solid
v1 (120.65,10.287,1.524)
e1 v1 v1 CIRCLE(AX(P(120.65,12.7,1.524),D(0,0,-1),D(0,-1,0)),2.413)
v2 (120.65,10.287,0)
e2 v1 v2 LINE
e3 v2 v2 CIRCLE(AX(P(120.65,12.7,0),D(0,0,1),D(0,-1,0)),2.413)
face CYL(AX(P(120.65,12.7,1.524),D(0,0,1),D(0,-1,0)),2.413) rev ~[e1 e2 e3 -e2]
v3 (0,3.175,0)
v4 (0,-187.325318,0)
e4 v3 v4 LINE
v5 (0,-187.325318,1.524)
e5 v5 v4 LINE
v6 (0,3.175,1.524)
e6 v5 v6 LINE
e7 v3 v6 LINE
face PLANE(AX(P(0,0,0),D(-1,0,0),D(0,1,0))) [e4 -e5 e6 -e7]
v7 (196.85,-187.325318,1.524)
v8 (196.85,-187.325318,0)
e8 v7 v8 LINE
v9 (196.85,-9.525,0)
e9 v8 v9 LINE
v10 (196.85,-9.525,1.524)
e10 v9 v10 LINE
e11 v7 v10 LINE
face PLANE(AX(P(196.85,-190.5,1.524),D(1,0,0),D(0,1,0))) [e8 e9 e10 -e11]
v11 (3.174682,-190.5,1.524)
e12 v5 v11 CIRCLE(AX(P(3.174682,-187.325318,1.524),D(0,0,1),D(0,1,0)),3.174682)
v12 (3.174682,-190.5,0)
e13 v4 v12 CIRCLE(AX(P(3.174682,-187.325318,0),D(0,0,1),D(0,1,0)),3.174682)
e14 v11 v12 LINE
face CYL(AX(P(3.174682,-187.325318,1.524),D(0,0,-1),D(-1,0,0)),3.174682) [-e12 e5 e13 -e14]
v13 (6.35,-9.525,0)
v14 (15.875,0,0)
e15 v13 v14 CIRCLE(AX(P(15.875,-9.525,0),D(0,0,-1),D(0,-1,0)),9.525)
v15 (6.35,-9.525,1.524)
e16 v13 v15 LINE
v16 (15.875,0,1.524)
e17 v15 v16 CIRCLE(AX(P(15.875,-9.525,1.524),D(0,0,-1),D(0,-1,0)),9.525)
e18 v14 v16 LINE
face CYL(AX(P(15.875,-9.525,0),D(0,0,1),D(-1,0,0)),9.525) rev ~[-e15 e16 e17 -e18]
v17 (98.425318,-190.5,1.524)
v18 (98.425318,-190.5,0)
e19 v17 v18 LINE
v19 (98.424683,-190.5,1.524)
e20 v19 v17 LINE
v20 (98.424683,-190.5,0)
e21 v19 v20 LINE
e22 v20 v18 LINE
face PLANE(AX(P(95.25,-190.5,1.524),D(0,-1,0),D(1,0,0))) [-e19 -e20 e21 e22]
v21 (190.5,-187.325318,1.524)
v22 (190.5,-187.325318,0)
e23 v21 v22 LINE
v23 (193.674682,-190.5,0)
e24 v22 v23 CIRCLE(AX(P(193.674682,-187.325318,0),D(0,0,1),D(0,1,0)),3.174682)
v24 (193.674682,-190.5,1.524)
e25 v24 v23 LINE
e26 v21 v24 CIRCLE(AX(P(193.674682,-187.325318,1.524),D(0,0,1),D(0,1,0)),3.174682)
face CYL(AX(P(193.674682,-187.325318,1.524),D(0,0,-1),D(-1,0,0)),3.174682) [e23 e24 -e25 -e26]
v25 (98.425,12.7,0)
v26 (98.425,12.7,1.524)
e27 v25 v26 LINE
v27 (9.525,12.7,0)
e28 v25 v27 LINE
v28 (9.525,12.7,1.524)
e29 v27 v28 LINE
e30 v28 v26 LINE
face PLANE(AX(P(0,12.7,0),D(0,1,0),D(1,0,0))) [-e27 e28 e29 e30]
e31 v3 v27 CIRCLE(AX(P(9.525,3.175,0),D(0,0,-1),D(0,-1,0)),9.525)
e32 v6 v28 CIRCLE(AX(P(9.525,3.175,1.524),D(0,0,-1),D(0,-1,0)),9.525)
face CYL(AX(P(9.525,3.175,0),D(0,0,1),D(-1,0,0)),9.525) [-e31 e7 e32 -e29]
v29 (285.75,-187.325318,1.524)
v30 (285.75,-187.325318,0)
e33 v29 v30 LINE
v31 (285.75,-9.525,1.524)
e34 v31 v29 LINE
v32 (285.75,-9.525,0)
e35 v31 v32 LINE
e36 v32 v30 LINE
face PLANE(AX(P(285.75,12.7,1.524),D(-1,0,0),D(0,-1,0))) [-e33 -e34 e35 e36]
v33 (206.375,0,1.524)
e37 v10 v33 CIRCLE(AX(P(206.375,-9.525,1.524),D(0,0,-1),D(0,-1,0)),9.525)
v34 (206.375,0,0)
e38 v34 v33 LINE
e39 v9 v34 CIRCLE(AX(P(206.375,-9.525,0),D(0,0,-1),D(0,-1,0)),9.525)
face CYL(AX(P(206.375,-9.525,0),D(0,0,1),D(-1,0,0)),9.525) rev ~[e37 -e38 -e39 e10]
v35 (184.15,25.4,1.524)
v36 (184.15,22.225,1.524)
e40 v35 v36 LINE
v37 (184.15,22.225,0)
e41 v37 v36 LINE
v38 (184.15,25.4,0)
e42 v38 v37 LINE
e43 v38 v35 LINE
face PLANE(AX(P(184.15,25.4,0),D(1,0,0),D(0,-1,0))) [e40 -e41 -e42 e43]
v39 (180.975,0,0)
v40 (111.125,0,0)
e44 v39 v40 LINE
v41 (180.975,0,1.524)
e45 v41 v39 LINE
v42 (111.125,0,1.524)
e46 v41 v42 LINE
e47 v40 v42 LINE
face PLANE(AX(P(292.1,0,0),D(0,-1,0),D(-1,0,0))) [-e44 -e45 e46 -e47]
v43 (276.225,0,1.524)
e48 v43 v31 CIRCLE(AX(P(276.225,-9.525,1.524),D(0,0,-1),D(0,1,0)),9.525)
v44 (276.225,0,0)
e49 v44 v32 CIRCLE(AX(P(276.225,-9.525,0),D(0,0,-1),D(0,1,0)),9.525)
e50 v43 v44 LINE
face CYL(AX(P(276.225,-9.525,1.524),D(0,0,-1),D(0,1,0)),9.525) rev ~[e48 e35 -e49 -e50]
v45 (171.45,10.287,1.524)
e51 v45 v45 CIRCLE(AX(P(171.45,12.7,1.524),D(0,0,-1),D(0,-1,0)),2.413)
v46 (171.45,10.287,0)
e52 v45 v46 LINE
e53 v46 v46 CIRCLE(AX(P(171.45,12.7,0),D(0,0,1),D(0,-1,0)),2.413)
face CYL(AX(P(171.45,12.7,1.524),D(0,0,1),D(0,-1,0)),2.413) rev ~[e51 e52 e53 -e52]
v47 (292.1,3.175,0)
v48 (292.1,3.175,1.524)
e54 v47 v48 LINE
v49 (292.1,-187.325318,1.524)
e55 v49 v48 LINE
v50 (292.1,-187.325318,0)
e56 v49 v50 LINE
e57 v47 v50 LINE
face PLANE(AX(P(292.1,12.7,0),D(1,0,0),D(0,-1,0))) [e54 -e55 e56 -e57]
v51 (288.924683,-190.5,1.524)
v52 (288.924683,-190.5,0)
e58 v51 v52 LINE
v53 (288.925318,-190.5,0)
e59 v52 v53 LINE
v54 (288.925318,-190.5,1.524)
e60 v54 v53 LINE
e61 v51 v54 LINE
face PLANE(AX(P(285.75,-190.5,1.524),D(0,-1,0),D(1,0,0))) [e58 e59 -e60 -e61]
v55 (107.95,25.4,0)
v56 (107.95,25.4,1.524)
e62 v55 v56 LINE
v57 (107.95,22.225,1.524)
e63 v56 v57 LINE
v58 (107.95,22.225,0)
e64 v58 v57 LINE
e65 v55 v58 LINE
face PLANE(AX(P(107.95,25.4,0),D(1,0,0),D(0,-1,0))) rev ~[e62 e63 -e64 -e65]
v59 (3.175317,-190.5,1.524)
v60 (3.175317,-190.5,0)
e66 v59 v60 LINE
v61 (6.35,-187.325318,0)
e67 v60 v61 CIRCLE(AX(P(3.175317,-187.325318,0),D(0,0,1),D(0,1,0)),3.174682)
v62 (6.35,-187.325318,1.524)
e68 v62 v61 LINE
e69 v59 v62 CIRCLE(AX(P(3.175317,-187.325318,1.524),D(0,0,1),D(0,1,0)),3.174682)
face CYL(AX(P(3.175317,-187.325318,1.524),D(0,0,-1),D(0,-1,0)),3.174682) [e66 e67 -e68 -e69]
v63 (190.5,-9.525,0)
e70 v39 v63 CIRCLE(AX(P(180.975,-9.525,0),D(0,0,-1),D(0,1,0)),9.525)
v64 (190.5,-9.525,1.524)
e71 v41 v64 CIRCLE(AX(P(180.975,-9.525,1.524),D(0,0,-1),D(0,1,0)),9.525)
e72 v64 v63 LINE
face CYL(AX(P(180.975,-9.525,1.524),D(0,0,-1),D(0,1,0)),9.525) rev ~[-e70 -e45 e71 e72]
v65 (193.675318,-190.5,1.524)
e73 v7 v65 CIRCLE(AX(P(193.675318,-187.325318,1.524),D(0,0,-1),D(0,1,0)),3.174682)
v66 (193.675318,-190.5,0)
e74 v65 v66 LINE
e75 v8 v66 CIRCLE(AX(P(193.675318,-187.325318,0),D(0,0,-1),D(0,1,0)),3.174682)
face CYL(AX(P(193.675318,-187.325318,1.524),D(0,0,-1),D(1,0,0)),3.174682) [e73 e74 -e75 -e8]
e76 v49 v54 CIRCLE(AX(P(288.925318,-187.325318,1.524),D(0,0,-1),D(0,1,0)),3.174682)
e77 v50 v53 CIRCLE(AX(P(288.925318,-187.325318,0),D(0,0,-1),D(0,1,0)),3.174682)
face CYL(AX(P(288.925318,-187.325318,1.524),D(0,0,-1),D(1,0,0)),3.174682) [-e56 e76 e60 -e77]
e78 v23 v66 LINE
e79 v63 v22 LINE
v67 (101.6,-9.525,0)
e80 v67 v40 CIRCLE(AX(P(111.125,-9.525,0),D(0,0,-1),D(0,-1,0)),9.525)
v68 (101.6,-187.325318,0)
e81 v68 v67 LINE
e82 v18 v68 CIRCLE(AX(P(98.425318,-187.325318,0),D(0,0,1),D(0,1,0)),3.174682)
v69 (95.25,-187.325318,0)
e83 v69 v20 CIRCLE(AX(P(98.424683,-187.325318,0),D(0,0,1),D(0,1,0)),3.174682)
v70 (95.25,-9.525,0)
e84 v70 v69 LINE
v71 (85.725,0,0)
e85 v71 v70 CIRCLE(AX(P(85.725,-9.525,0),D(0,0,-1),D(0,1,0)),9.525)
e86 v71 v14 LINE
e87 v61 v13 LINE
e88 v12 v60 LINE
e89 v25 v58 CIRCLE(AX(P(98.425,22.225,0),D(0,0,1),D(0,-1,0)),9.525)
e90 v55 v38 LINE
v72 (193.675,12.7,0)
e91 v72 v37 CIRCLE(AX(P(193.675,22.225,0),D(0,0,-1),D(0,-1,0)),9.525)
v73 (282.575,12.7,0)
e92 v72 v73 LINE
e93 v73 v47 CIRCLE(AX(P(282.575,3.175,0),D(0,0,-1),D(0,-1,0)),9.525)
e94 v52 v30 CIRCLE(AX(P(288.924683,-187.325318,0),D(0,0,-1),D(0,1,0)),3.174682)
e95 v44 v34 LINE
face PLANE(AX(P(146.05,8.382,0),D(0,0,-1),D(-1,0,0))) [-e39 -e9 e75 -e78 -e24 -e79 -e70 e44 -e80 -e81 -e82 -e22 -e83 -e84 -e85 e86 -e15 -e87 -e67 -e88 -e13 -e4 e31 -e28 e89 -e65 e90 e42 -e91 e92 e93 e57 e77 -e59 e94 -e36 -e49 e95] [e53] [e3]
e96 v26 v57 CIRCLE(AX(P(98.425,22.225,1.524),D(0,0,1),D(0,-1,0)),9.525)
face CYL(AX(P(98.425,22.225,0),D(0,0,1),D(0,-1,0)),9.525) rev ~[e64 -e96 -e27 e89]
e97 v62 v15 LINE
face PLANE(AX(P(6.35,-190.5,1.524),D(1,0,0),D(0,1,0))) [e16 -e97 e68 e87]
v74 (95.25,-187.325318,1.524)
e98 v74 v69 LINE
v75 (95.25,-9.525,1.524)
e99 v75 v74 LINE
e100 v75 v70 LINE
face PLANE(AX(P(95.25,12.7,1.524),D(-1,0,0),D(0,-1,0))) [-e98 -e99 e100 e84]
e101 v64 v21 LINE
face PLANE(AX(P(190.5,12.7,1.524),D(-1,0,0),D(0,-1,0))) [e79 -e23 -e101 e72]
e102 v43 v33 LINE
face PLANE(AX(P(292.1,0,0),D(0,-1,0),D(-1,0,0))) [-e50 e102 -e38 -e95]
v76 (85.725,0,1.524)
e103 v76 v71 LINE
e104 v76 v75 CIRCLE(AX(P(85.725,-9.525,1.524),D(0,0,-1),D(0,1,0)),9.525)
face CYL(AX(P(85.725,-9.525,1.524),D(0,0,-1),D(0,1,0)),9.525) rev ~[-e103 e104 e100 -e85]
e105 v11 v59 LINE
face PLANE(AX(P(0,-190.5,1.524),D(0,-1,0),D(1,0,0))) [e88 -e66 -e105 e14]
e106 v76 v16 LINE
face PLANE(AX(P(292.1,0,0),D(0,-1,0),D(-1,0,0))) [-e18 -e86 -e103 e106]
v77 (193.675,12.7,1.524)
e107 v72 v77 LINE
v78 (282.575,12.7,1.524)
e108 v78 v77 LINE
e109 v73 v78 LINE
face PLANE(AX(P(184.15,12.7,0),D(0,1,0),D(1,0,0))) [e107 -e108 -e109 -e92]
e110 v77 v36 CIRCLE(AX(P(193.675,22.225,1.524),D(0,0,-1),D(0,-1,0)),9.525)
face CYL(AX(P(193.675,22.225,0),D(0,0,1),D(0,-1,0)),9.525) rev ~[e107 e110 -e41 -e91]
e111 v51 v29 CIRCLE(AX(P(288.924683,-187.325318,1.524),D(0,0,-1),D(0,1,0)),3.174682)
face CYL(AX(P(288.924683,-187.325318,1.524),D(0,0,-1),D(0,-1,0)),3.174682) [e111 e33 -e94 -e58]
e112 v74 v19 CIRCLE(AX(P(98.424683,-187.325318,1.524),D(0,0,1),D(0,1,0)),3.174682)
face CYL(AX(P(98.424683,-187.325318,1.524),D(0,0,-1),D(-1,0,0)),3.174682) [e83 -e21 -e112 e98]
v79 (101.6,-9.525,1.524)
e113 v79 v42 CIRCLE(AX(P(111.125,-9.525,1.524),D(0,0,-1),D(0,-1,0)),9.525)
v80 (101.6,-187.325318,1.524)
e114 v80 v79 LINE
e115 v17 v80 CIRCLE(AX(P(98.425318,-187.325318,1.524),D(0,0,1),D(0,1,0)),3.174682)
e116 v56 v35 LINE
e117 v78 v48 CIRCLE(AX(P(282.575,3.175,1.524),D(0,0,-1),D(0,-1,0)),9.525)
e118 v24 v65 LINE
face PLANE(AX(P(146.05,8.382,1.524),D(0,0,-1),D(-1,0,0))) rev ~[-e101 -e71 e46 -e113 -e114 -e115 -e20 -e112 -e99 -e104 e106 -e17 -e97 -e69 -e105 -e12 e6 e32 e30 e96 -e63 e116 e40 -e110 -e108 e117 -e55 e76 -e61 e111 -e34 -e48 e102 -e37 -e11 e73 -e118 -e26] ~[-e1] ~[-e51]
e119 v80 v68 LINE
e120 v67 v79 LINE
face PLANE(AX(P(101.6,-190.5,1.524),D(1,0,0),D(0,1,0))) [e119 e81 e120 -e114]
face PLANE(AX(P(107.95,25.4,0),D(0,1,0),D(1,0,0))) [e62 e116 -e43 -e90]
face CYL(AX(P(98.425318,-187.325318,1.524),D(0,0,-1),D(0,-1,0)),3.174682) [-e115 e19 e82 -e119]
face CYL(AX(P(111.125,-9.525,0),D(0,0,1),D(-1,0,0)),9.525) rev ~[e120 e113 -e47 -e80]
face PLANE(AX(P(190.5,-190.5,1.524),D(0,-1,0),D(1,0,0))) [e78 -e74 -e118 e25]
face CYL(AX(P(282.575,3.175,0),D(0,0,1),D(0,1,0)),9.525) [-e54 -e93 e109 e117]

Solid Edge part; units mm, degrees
sketch "Sketch1" plane through (0, 0, 0) normal (0, 0, 1) x (1, 0, 0)
  line L0 (0, 0) -> (0, 12.7)
  line L1 (0, 12.7) -> (107.95, 12.7)
  line L2 (107.95, 25.4) -> (107.95, 12.7)
  line L3 (107.95, 25.4) -> (184.15, 25.4)
  line L4 (184.15, 25.4) -> (184.15, 12.7)
  line L5 (184.15, 12.7) -> (292.1, 12.7)
  line L6 (292.1, 12.7) -> (292.1, 0)
  line L7 (292.1, 0) -> (0, 0)
  dimension "D1" = 292.1
  dimension "D2" = 12.7
  dimension "D3" = 38.1
  dimension "D4" = 76.2
  dimension "D5" = 12.7
extrude "Protrusion1" add sketch "Sketch1" along normal blind 1.524
sketch "Sketch2" plane through (146.05, 12.7, 1.524) normal (0, 0, 1) x (1, 0, 0)
  line L0 (-146.05, 0) -> (-146.05, -203.2)
  line L1 (-146.05, -203.2) -> (-139.7, -203.2)
  line L2 (-139.7, -203.2) -> (-139.7, 0)
  line L3 (-139.7, 0) -> (-146.05, 0)
  dimension "D1" = 203.2
  dimension "D2" = 6.35
extrude "Protrusion_2" add sketch "Sketch2" against normal blind 1.524
pattern_linear "Pattern1" count 4 spacing 95.25 along (1, 0, 0) of "Protrusion_2"
fillet "Round_1" radius 9.525 10 edges at (0, 12.7, 0.762) (6.35, 0, 0.762) (95.25, 0, 0.762) (101.6, 0, 0.762) (107.95, 12.7, 0.762) (184.15, 12.7, 0.762) (190.5, 0, 0.762) (196.85, 0, 0.762) (285.75, 0, 0.762) (292.1, 12.7, 0.762)
fillet "Round_2" radius 3.175 8 edges at (0, -190.5, 0.762) (6.35, -190.5, 0.762) (95.25, -190.5, 0.762) (101.6, -190.5, 0.762) (190.5, -190.5, 0.762) (196.85, -190.5, 0.762) (285.75, -190.5, 0.762) (292.1, -190.5, 0.762)
hole "Hole_1" at (171.45, 12.7, 1.524) direction (0, 0, -1) diameter 4.826 end up to next
hole "Hole1" at (120.65, 12.7, 1.524) direction (0, 0, -1) diameter 4.826 end up to next
